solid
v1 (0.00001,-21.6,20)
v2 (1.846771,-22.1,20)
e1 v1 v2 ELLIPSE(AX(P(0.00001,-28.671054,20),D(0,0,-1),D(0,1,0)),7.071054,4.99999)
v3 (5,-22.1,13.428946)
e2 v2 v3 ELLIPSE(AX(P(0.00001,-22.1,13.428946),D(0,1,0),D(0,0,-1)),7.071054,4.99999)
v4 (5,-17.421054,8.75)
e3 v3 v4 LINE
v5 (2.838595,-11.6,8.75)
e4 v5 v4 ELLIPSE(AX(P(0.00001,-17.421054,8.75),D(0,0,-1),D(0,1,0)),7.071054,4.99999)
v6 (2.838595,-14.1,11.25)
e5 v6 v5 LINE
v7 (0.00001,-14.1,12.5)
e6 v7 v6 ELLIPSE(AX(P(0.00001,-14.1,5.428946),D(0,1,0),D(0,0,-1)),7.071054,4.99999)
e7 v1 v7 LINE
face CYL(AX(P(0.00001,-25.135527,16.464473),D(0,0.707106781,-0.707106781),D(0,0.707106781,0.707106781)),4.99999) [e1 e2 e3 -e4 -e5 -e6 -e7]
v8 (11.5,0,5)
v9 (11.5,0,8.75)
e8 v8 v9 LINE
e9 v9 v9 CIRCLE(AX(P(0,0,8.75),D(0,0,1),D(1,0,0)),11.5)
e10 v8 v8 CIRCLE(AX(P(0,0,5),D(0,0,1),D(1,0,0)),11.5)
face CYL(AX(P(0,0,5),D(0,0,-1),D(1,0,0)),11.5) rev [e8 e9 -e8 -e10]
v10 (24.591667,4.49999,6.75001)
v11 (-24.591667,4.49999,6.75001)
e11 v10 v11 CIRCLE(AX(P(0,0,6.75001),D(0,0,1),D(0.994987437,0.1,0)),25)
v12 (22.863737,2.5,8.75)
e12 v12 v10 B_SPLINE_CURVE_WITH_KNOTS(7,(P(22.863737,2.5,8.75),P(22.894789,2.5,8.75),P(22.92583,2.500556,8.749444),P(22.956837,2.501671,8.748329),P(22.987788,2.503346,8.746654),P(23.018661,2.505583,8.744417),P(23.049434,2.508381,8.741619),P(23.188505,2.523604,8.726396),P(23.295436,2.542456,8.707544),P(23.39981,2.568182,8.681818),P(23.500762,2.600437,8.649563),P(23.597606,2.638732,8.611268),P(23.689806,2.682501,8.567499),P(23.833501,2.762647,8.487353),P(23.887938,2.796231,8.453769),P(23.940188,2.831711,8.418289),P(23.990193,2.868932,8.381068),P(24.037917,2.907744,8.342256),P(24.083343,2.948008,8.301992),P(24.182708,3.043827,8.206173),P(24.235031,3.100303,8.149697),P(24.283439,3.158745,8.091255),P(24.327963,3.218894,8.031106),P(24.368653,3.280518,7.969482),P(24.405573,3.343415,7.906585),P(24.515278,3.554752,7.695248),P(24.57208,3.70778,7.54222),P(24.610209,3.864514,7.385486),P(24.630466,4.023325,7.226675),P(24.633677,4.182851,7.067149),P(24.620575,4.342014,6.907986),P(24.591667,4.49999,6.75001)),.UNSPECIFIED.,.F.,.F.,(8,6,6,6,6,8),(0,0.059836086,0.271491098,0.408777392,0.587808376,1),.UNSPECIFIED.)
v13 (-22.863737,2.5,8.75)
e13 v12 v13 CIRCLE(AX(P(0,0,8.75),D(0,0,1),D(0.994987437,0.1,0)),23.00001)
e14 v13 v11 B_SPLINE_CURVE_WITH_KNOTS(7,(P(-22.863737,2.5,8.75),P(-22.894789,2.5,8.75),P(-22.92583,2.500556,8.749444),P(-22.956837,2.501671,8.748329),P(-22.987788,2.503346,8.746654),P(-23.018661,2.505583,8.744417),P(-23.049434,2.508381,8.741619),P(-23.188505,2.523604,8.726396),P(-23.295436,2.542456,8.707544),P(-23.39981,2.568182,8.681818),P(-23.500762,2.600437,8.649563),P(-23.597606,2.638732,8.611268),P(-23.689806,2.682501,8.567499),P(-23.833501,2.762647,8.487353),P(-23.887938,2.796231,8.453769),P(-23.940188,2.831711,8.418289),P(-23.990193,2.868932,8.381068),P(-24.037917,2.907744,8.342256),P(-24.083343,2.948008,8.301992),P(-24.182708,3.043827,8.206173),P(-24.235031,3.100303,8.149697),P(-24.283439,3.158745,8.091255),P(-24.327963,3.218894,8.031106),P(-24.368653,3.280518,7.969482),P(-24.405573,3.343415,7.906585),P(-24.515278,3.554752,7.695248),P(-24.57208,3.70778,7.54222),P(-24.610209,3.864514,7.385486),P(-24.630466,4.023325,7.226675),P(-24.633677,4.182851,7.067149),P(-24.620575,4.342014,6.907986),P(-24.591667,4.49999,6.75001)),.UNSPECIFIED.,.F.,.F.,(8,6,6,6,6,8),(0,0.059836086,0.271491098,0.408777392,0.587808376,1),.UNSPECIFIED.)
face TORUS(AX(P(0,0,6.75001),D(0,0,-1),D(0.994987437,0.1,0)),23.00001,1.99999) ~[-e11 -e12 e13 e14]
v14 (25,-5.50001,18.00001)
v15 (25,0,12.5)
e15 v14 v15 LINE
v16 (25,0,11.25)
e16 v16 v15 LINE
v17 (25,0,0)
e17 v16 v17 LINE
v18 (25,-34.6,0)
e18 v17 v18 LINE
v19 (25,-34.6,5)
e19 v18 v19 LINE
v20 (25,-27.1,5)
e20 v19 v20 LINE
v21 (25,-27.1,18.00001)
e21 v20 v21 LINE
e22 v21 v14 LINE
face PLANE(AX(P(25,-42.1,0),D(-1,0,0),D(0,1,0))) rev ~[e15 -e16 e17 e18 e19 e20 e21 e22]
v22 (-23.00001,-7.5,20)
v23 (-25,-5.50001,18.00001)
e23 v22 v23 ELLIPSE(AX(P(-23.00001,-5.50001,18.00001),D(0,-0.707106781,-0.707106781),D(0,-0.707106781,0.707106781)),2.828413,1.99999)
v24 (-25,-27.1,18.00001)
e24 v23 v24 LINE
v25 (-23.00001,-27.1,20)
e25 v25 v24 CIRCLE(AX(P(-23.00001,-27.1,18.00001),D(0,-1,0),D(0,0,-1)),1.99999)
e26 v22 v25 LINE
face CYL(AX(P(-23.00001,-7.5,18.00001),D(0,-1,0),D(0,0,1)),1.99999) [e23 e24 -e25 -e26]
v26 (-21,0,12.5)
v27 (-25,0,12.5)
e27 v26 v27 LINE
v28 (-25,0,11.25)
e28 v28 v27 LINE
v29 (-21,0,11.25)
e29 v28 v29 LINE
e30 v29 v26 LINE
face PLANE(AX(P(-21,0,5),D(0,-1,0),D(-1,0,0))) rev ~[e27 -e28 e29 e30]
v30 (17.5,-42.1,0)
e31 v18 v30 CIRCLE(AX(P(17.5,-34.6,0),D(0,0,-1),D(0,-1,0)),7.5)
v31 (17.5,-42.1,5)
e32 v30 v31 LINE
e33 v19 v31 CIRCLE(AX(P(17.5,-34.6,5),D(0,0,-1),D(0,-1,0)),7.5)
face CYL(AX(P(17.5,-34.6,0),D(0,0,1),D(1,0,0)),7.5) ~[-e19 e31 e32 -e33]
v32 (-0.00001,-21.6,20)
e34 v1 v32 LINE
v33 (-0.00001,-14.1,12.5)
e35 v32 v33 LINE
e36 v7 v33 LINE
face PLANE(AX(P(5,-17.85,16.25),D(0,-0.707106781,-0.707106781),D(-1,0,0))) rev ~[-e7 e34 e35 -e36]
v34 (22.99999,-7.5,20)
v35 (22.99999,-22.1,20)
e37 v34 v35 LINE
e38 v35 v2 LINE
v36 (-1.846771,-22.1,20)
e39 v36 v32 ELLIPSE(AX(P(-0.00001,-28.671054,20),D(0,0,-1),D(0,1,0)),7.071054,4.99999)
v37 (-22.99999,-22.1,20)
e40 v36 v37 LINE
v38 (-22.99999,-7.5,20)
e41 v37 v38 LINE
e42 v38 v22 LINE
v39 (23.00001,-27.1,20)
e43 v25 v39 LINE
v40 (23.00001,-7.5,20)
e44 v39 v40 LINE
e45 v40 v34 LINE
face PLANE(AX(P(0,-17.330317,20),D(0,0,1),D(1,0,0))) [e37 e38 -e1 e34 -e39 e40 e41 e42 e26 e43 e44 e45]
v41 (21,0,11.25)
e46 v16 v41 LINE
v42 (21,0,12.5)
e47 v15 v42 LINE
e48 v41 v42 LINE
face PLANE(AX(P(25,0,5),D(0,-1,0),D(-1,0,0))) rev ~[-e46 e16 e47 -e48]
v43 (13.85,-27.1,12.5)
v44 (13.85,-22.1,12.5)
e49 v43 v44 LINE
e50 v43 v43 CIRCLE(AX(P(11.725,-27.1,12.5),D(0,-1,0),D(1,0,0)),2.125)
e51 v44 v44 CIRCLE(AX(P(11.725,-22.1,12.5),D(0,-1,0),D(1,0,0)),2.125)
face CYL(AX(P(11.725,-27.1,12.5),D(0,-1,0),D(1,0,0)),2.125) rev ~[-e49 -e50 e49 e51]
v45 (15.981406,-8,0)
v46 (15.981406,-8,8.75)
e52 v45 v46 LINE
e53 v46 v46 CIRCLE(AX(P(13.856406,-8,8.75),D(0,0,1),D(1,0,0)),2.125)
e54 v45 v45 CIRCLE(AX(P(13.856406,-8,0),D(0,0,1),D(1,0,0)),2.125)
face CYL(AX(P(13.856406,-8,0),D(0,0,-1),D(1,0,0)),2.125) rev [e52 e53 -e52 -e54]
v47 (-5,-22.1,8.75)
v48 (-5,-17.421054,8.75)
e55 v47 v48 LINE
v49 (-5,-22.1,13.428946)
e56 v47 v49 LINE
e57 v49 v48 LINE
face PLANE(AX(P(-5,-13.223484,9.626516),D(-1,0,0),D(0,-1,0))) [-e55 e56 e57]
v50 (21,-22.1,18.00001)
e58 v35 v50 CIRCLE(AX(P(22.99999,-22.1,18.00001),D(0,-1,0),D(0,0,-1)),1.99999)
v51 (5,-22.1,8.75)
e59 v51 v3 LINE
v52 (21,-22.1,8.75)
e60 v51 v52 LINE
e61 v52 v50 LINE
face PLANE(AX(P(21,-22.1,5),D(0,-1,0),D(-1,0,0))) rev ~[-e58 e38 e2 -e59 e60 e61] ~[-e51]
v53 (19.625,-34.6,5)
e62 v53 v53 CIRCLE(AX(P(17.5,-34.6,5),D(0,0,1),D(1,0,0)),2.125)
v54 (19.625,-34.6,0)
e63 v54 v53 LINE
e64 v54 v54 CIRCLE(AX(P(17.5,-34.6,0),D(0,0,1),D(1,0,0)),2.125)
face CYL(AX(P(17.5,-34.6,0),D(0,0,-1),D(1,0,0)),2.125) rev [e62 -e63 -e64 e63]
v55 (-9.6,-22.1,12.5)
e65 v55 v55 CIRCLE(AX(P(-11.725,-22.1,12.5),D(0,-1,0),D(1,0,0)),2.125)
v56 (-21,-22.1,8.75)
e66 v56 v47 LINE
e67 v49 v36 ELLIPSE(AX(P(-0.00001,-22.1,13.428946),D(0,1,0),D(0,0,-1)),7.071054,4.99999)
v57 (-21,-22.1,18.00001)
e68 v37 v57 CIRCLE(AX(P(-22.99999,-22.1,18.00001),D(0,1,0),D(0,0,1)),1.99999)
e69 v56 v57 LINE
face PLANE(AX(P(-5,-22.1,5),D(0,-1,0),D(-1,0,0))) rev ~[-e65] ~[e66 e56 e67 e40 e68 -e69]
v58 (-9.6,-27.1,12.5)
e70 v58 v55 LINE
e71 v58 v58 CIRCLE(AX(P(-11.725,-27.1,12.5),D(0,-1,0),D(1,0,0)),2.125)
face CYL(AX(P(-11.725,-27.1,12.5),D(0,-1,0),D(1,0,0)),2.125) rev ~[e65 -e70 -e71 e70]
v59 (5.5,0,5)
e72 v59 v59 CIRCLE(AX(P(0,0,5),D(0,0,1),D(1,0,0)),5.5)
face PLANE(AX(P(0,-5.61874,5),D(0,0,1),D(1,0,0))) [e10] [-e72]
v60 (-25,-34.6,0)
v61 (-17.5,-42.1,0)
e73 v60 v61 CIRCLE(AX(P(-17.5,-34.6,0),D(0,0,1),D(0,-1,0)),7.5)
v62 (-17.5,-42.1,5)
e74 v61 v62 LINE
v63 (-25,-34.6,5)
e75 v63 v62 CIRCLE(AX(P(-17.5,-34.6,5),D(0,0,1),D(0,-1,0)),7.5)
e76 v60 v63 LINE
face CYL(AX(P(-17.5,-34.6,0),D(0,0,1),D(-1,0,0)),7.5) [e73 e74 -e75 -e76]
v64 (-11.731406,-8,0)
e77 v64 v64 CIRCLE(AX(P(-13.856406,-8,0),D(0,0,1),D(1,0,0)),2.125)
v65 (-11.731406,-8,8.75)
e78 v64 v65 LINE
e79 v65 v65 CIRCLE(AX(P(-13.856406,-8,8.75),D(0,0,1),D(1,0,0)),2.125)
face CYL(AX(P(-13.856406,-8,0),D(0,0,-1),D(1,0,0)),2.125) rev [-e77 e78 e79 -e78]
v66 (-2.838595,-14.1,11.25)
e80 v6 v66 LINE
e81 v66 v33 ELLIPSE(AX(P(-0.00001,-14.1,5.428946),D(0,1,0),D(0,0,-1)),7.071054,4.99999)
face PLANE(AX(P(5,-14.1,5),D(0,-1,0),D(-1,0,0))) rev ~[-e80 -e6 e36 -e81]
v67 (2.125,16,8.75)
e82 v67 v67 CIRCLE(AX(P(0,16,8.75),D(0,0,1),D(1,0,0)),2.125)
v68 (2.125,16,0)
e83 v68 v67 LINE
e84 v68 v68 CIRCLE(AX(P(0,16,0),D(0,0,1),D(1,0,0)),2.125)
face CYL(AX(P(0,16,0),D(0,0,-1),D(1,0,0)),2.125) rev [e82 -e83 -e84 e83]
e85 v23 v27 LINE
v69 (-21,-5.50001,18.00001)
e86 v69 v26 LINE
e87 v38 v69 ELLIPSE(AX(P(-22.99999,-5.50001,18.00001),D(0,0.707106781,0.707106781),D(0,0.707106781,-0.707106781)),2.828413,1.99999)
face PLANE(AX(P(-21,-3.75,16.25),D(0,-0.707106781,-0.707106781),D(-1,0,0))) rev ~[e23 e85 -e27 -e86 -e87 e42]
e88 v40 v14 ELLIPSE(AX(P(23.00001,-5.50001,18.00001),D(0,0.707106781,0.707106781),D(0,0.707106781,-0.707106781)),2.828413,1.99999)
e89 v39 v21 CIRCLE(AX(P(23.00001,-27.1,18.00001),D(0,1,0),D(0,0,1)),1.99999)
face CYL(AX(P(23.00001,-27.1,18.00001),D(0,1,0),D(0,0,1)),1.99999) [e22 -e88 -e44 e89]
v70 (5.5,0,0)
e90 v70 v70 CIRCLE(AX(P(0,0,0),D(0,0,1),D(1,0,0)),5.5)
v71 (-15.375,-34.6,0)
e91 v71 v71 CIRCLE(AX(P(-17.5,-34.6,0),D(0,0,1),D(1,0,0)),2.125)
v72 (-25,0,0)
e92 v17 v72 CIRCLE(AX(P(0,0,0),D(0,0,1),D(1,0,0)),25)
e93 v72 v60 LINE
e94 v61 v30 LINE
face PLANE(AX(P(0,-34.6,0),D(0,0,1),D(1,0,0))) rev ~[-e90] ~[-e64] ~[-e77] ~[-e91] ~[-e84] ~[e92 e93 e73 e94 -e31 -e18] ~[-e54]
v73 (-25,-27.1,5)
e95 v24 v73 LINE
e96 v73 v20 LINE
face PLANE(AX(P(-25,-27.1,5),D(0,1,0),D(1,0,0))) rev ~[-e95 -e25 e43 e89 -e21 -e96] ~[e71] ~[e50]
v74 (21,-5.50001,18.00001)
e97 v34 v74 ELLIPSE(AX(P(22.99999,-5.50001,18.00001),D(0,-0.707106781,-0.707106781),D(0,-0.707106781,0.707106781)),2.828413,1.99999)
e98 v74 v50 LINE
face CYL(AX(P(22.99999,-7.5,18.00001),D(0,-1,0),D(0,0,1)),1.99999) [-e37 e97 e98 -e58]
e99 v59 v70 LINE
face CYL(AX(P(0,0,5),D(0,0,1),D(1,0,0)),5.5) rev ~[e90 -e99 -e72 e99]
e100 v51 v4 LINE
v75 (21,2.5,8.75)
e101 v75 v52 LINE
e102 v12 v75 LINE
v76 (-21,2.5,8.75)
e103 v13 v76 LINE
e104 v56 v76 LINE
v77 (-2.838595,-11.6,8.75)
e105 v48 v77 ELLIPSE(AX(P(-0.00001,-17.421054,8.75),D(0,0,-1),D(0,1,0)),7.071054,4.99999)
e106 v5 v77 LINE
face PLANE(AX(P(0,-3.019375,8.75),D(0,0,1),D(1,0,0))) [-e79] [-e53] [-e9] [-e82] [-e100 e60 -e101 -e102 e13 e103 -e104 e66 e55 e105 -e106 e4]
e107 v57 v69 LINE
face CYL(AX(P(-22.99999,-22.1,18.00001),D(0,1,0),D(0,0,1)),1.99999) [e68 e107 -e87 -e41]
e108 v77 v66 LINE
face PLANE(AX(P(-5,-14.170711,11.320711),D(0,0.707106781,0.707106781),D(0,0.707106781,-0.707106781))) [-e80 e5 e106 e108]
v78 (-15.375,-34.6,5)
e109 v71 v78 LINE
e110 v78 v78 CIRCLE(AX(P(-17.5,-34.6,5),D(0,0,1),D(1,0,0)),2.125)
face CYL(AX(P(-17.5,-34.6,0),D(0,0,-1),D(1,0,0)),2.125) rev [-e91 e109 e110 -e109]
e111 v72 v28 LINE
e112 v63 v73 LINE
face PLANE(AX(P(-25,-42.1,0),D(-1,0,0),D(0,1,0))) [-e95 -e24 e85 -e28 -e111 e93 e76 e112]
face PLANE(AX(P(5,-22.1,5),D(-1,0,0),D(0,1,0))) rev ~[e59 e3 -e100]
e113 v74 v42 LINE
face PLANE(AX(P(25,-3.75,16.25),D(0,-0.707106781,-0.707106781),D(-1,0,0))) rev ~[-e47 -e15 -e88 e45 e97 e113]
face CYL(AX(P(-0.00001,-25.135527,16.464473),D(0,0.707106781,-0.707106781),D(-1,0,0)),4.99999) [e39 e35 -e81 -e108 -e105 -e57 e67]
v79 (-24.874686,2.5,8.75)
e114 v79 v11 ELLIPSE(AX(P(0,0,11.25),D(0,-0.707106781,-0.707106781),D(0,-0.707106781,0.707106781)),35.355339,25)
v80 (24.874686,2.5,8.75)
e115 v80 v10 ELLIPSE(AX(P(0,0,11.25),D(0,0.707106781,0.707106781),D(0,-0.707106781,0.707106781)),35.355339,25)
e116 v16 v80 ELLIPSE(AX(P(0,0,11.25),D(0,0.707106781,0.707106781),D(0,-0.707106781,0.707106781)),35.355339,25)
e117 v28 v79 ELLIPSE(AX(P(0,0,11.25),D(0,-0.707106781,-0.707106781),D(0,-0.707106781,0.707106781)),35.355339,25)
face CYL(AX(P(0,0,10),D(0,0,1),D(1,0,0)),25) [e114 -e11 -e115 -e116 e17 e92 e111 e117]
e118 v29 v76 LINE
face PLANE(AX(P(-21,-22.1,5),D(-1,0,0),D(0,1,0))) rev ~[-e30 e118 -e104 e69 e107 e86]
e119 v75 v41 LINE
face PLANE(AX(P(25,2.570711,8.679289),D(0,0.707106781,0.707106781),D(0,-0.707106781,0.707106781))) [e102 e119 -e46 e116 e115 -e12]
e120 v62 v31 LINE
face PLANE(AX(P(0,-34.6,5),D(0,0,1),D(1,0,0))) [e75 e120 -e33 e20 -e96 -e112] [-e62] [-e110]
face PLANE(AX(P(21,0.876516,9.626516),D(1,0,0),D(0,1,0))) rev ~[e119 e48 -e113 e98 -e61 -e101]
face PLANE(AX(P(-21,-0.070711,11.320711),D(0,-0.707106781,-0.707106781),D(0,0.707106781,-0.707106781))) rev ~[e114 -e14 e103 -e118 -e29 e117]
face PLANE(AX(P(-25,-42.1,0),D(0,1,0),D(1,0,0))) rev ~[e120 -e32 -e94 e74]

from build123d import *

# Parameters (mm, degrees)
F0_R          = 2.125
F0_R_2        = 5.25
F1_DEPTH      = 5
F3_DEPTH      = 15
F4_R          = 2.125
F5_DEPTH      = 25
F6_W          = 50
F6_H          = 15
F6_R          = 2.125
F7_DEPTH      = 5
F8_R          = 7.5
F9_SIZE       = 7.5
F10_R         = 2.125
F10_R_2       = 11.5
F11_DEPTH     = 3.75
F12_T1_DEPTH  = 10
F12_T6_DEPTH  = 4
F12_S7_R      = 25
F12_T8_DEPTH  = 4
F12_T12_DEPTH = 4
F12_S13_R     = 25
F12_T14_DEPTH = 4
F13_R         = 4.99999
F14_R         = 1.99999
F15_R         = 5.5
F16_DEPTH     = 25


# Not quite as in the source:
# - a fillet or chamfer that OpenCascade refuses, or shapes differently, is made with other operations: its cross-section is extruded or revolved along the edge and cut away or added
# - a fillet or chamfer is up to 0.001 mm smaller than in the source, because OpenCascade refuses the exact size


with BuildPart() as f1:
    # F0 (on Top) → F1 (new body)
    with BuildSketch(Plane.XY):
        with BuildLine():
            Line((25, -27.1), (25, -22.1))
            Line((25, -22.1), (25, 0))
            ThreePointArc((25, 0), (0, 25), (-25, 0))
            Line((-25, 0), (-25, -22.1))
            Line((-25, -22.1), (-25, -27.1))
            Line((-25, -27.1), (25, -27.1))
        make_face()
        with Locations((-13.8564064606, -8)):
            Circle(F0_R, mode=Mode.SUBTRACT)
        with Locations((13.8564064606, -8)):
            Circle(F0_R, mode=Mode.SUBTRACT)
        Circle(F0_R_2, mode=Mode.SUBTRACT)
        with Locations((0, 16)):
            Circle(F0_R, mode=Mode.SUBTRACT)
    extrude(amount=F1_DEPTH)

    # F2 (on face) → F3 (join)
    with BuildSketch(Plane.XY.offset(5)):
        Polygon((-25, -27.1), (25, -27.1), (25, -22.1), (25, 0), (21, 0), (21, -22.1), (5, -22.1), (5, -14.1), (0, -14.1), (-5, -14.1), (-5, -22.1), (-21, -22.1), (-21, 0), (-25, 0), (-25, -22.1), align=None)
    extrude(amount=F3_DEPTH)

    # F4 (on face) → F5 (cut)
    with BuildSketch(Plane.XZ.offset(27.1)):
        with Locations((-11.725, 12.5)):
            Circle(F4_R)
        with Locations((11.725, 12.5)):
            Circle(F4_R)
    extrude(amount=-F5_DEPTH, mode=Mode.SUBTRACT)

    # F6 (on Top) → F7 (join)
    with BuildSketch(Plane.XY):
        with Locations((0, -34.6)):
            Rectangle(F6_W, F6_H)
        with Locations((-17.5, -34.6)):
            Circle(F6_R, mode=Mode.SUBTRACT)
        with Locations((17.5, -34.6)):
            Circle(F6_R, mode=Mode.SUBTRACT)
    extrude(amount=F7_DEPTH)

    # F8
    f8_edges = [f1.edges().sort_by_distance(p)[0] for p in [
        (-25, -42.1, 2.5),
        (25, -42.1, 2.5),
    ]]
    fillet(f8_edges, radius=F8_R)

    # F9
    f9_edges = [f1.edges().sort_by_distance(p)[0] for p in [
        (0, -14.1, 20),
        (-23, 0, 20),
        (23, 0, 20),
    ]]
    chamfer(f9_edges, length=F9_SIZE)

    # F10 (on face) → F11 (join)
    with BuildSketch(Plane.XY.offset(5)):
        with BuildLine():
            Line((25, -22.1), (25, 0))
            ThreePointArc((25, 0), (0, 25), (-25, 0))
            Line((-25, 0), (-25, -22.1))
            Line((-25, -22.1), (25, -22.1))
        make_face()
        with Locations((-13.8564064606, -8)):
            Circle(F10_R, mode=Mode.SUBTRACT)
        Circle(F10_R_2, mode=Mode.SUBTRACT)
        with Locations((13.8564064606, -8)):
            Circle(F10_R, mode=Mode.SUBTRACT)
        with Locations((0, 16)):
            Circle(F10_R, mode=Mode.SUBTRACT)
    extrude(amount=F11_DEPTH)

    # F12: chamfer of 2.5 on 3 edges, made by hand

    # F12_s2 → F12_t1 (join)
    with BuildSketch(Plane.YZ.offset(-5)):
        with BuildLine():
            Line((-14.1707106781, 11.3207106781), (-11.5292893219, 8.6792893219))
            Line((-11.5292893219, 8.6792893219), (-11.5292893219, 8.6292893219))
            ThreePointArc((-11.5292893219, 8.6292893219), (-12.8146446609, 8.7), (-14.1, 8.7))
            Line((-14.1, 8.7), (-14.15, 8.75))
            ThreePointArc((-14.15, 8.75), (-14.15, 10.0353553391), (-14.2207106781, 11.3207106781))
            Line((-14.2207106781, 11.3207106781), (-14.1707106781, 11.3207106781))
        make_face()
    extrude(amount=F12_T1_DEPTH)


with BuildPart() as f12_tool4:
    # F12_s5 → F12_t6 (new body)
    with BuildSketch(Plane.YZ.offset(-21)):
        with BuildLine():
            Line((-0.0707106781, 11.3207106781), (2.5707106781, 8.6792893219))
            Line((2.5707106781, 8.6792893219), (2.5707106781, 8.6292893219))
            ThreePointArc((2.5707106781, 8.6292893219), (1.2853553391, 8.7), (0, 8.7))
            Line((0, 8.7), (-0.05, 8.75))
            ThreePointArc((-0.05, 8.75), (-0.05, 10.0353553391), (-0.1207106781, 11.3207106781))
            Line((-0.1207106781, 11.3207106781), (-0.0707106781, 11.3207106781))
        make_face()
    extrude(amount=-F12_T6_DEPTH)

    # F12_s7 → F12_t8 (intersect, symmetric)
    with BuildSketch(Plane.XY.offset(10)):
        Circle(F12_S7_R)
    extrude(amount=F12_T8_DEPTH, both=True, mode=Mode.INTERSECT)


with BuildPart() as f1_1:
    add(f1.part)

    # F12_t3: union F12_tool4
    add(f12_tool4.part)


with BuildPart() as f12_tool10:
    # F12_s11 → F12_t12 (new body)
    with BuildSketch(Plane.YZ.offset(25)):
        with BuildLine():
            Line((2.5707106781, 8.6792893219), (-0.0707106781, 11.3207106781))
            Line((-0.0707106781, 11.3207106781), (-0.1207106781, 11.3207106781))
            ThreePointArc((-0.1207106781, 11.3207106781), (-0.05, 10.0353553391), (-0.05, 8.75))
            Line((-0.05, 8.75), (0, 8.7))
            ThreePointArc((0, 8.7), (1.2853553391, 8.7), (2.5707106781, 8.6292893219))
            Line((2.5707106781, 8.6292893219), (2.5707106781, 8.6792893219))
        make_face()
    extrude(amount=-F12_T12_DEPTH)

    # F12_s13 → F12_t14 (intersect, symmetric)
    with BuildSketch(Plane.XY.offset(10)):
        Circle(F12_S13_R)
    extrude(amount=F12_T14_DEPTH, both=True, mode=Mode.INTERSECT)


with BuildPart() as f1_2:
    add(f1_1.part)

    # F12_t9: union F12_tool10
    add(f12_tool10.part)

    # F13 (radius 5 in the source; OpenCascade refuses exactly that, so slightly less here)
    f13_edges = [f1_2.edges().sort_by_distance(p)[0] for p in [
        (5, -17.85, 16.25),
        (-5, -17.85, 16.25),
    ]]
    fillet(f13_edges, radius=F13_R)

    # F14 (radius 2 in the source; OpenCascade refuses exactly that, so slightly less here)
    f14_edges = [f1_2.edges().sort_by_distance(p)[0] for p in [
        (21, -14.8, 20),
        (25, -17.3, 20),
        (-21, -14.8, 20),
        (-25, -17.3, 20),
        (0, 25, 8.75),
    ]]
    fillet(f14_edges, radius=F14_R)

    # F15 (on face) → F16 (cut)
    with BuildSketch(Plane.XY.offset(5)):
        Circle(F15_R)
    extrude(amount=-F16_DEPTH, mode=Mode.SUBTRACT)


solid = f1_2.part
